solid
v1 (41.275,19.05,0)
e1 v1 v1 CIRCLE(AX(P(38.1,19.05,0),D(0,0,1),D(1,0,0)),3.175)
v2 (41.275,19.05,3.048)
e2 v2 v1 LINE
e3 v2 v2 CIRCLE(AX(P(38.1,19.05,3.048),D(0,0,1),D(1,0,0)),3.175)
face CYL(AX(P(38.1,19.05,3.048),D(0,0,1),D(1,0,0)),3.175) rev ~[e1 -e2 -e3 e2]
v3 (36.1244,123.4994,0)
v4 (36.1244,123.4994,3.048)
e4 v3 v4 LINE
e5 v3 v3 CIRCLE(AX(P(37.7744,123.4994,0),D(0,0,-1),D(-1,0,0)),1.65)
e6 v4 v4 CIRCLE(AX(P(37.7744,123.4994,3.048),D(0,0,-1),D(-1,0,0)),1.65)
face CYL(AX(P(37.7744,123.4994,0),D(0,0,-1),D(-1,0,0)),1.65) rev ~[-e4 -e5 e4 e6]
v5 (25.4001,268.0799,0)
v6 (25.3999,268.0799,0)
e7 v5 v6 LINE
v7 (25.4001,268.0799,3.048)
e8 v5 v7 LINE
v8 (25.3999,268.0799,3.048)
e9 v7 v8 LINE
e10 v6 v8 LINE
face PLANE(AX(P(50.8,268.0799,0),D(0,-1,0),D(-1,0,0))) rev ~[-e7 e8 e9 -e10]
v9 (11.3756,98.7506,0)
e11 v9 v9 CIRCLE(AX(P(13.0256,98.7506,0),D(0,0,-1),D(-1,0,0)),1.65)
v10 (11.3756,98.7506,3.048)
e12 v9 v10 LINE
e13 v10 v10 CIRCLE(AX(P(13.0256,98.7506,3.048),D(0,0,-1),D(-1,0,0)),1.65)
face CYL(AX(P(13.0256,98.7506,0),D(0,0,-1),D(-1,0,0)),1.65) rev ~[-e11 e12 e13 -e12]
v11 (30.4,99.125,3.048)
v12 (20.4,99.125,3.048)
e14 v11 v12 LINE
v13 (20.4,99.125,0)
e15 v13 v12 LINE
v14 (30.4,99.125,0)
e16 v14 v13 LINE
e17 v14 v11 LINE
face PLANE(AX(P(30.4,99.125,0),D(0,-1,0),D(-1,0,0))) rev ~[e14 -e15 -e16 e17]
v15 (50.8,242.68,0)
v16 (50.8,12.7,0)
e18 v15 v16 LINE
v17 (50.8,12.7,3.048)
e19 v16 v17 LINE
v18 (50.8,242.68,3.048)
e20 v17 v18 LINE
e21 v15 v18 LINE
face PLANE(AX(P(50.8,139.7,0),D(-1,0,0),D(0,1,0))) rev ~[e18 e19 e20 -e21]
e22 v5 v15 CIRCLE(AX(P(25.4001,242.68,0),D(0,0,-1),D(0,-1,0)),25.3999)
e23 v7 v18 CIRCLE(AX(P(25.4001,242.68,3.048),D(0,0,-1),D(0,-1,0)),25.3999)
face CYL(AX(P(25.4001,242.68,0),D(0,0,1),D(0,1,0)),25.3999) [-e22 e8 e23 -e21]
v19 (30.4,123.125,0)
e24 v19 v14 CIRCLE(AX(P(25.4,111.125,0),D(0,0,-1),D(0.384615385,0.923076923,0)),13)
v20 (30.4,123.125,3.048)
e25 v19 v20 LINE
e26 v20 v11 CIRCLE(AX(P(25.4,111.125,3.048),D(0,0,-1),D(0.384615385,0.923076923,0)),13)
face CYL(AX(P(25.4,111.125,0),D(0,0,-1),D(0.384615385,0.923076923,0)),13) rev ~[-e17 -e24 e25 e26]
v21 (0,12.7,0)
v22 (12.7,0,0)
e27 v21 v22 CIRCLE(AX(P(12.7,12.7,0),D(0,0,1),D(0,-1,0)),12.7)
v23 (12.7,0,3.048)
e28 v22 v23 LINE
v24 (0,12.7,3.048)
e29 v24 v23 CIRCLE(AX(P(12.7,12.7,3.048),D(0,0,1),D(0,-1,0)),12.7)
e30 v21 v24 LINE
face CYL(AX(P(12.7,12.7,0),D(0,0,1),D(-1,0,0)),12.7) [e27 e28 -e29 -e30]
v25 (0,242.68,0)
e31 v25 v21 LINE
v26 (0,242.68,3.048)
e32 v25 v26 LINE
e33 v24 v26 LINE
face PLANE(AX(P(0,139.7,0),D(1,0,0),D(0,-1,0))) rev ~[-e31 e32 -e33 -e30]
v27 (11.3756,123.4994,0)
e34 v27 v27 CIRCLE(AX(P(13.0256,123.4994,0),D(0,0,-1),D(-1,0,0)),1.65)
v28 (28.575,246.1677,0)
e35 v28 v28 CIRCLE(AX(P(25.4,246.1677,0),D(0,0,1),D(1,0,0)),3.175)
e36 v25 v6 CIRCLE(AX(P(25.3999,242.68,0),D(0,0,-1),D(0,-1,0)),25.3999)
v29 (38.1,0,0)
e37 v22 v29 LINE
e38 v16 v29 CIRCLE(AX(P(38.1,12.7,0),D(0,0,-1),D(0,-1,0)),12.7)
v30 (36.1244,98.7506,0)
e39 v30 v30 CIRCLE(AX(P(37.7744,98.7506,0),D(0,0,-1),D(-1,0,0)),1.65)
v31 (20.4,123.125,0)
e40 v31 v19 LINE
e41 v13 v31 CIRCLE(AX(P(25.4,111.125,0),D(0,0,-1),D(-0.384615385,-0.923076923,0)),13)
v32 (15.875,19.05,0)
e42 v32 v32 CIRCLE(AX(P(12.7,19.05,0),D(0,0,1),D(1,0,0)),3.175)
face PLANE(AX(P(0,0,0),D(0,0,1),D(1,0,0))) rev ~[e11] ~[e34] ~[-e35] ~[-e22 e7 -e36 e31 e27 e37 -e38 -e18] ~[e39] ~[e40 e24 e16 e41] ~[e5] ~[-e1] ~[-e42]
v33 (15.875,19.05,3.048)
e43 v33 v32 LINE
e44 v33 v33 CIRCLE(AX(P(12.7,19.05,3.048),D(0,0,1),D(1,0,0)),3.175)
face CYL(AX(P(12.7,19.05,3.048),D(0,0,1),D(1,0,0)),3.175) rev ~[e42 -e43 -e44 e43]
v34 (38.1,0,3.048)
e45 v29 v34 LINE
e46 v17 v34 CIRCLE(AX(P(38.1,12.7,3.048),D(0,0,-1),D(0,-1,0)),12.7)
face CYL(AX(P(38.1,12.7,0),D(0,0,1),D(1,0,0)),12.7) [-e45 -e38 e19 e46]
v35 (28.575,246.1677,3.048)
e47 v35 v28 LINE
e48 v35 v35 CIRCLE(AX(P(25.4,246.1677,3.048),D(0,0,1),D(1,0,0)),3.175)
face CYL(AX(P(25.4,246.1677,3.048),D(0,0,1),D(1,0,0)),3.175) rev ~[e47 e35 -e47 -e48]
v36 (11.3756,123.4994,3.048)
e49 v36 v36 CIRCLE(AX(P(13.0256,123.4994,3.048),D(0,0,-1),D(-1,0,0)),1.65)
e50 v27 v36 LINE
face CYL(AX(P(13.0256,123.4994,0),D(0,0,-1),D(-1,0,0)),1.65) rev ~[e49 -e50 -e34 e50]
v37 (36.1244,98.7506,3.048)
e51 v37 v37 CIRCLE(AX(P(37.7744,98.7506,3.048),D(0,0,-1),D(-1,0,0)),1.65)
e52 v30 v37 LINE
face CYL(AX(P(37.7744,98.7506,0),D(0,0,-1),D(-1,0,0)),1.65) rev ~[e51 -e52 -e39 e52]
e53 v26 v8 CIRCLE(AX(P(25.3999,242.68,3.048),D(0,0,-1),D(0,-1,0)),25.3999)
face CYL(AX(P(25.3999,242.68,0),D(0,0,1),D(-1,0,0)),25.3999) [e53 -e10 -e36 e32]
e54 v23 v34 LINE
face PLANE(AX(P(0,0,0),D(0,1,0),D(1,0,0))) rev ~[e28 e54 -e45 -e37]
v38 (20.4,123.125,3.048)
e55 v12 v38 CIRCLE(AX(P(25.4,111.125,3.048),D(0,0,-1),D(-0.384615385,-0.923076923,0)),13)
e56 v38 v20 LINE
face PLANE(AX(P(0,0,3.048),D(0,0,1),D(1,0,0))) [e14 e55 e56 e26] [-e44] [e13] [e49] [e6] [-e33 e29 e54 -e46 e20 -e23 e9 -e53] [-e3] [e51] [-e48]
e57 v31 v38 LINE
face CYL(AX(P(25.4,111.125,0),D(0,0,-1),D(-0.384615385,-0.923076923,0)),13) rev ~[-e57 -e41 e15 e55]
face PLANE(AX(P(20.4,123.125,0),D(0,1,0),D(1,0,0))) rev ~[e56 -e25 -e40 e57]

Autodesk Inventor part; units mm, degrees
ref_plane "YZ Plane" through (0, 0, 0) normal (1, 0, 0) x (0, 1, 0)
ref_plane "XZ Plane" through (0, 0, 0) normal (0, 1, 0) x (-1, 0, 0)
ref_plane "XY Plane" through (0, 0, 0) normal (0, 0, 1) x (1, 0, 0)
sketch "Sketch1" plane through (0, 0, 0) normal (0, 0, 1) x (1, 0, 0)
  line L0 (0, 0) -> (50.8, 0)
  line L1 (50.8, 0) -> (50.8, 27.1979)
  line L2 (50.8, 139.7) -> (0, 139.7) construction
  line L3 (0, 139.7) -> (0, 0)
  line L4 (128.6063, 161.9886) -> (104.1161, 68.3618)
  line L5 (418.4795, 73.9788) -> (-1.9313, 310.0684)
  arc A0 (104.1161, 68.3618) -> (50.8, 27.1979) centre (93.3487, 27.1979) ccw construction
  line L6 (128.6063, 161.9886) -> (145.6601, 227.1856)
  line L7 (63.1831, 62.4318) -> (91.6427, 171.2335) construction
  arc A1 (50.8, 139.7) -> (91.6427, 171.2335) centre (50.8, 181.9168) ccw
  line L8 (95.8188, 187.1988) -> (111.3222, 246.4687)
  line L9 (91.6427, 171.2335) -> (95.8188, 187.1988)
  line L10 (50.8, 27.1979) -> (50.8, 139.7)
  line L11 (417.0097, 172.2938) -> (-48.9451, 294.1693)
  line L12 (50.8, 139.7) -> (50.8, 268.0799)
  line L13 (50.8, 268.0799) -> (0, 268.0799)
  line L14 (0, 268.0799) -> (0, 139.7)
  dimension "d0" = 50.8
  dimension "d1" = 139.7
extrude "Plate1" add sketch "Sketch1" along normal blind 3.048 contours L3 L14 L13 L12 L10 L1 L0
fillet "Corner Round2" radius 12.7 2 edges at (50.8, 0, 1.524) (0, 0, 1.524)
sketch "Sketch2" plane through (0, 0, 0) normal (0, 0, -1) x (-1, 0, 0)
  arc A0 (-20.4, 99.125) -> (-20.4, 123.125) centre (-25.4, 111.125) ccw projected
  line L0 (-20.4, 123.125) -> (-30.4, 123.125) projected
  line L1 (-30.4, 99.125) -> (-20.4, 99.125) projected
  arc A1 (-30.4, 123.125) -> (-30.4, 99.125) centre (-25.4, 111.125) ccw projected
  circle A2 centre (-13.0256, 98.7506) radius 1.65 projected
  circle A3 centre (-37.7744, 123.4994) radius 1.65 projected
  circle A4 centre (-13.0256, 123.4994) radius 1.65 projected
  circle A5 centre (-37.7744, 98.7506) radius 1.65 projected
  point P0 (0, 0)
extrude "Extrusion1" cut sketch "Sketch2" against normal up to surface (3.048 mm away)
fillet "Corner Round4" radius 25.4 2 edges at (50.8, 268.0799, 1.524) (0, 268.0799, 1.524)
sketch "Sketch6" plane through (0, 0, 3.048) normal (0, 0, 1) x (1, 0, 0)
  line L0 (406.4, 135.7009) -> (-31.623, 262.7009) construction
  circle A0 centre (25.4, 246.1677) radius 3.175
  arc A1 (50.8, 242.6799) -> (0, 242.6799) centre (25.4, 242.6799) ccw projected
  point P0 (0, 0)
  dimension "d33" = 6.35
  dimension "d34" = 0
extrude "Extrusion4" cut sketch "Sketch6" against normal up to next
sketch "Sketch7" plane through (0, 0, 3.048) normal (0, 0, 1) x (1, 0, 0)
  circle A0 centre (12.7, 19.05) radius 3.175
  circle A1 centre (38.1, 19.05) radius 3.175
  line L0 (38.1, 0) -> (12.7, 0) projected
  line L1 (0, 12.7) -> (0, 242.6799) projected
  line L2 (50.8, 242.6799) -> (50.8, 12.7) projected
  point P0 (0, 0)
  dimension "d37" = 6.35
  dimension "d38" = 6.35
  dimension "d39" = 19.05
  dimension "d40" = 12.7
  dimension "d41" = 12.7
extrude "Extrusion5" cut sketch "Sketch7" against normal up to next
equation "\"d10\" = Thickness"
equation "\"BendRadius\" = Thickness"
equation "\"BendReliefWidth\" = Thickness"
equation "\"BendReliefDepth\" = 0.5 * Thickness"
equation "\"CornerReliefSize\" = 4 * Thickness"
equation "\"MinimumRemnant\" = 2 * Thickness"
equation "\"TransitionRadius\" = BendRadius"
equation "\"JacobiRadiusSize\" = Thickness"
equation "\"GapSize\" = Thickness"
equation "\"d2\" = BendRadius"
equation "\"Thickness\" = 3.048"
properties part number "pG188Mount"
